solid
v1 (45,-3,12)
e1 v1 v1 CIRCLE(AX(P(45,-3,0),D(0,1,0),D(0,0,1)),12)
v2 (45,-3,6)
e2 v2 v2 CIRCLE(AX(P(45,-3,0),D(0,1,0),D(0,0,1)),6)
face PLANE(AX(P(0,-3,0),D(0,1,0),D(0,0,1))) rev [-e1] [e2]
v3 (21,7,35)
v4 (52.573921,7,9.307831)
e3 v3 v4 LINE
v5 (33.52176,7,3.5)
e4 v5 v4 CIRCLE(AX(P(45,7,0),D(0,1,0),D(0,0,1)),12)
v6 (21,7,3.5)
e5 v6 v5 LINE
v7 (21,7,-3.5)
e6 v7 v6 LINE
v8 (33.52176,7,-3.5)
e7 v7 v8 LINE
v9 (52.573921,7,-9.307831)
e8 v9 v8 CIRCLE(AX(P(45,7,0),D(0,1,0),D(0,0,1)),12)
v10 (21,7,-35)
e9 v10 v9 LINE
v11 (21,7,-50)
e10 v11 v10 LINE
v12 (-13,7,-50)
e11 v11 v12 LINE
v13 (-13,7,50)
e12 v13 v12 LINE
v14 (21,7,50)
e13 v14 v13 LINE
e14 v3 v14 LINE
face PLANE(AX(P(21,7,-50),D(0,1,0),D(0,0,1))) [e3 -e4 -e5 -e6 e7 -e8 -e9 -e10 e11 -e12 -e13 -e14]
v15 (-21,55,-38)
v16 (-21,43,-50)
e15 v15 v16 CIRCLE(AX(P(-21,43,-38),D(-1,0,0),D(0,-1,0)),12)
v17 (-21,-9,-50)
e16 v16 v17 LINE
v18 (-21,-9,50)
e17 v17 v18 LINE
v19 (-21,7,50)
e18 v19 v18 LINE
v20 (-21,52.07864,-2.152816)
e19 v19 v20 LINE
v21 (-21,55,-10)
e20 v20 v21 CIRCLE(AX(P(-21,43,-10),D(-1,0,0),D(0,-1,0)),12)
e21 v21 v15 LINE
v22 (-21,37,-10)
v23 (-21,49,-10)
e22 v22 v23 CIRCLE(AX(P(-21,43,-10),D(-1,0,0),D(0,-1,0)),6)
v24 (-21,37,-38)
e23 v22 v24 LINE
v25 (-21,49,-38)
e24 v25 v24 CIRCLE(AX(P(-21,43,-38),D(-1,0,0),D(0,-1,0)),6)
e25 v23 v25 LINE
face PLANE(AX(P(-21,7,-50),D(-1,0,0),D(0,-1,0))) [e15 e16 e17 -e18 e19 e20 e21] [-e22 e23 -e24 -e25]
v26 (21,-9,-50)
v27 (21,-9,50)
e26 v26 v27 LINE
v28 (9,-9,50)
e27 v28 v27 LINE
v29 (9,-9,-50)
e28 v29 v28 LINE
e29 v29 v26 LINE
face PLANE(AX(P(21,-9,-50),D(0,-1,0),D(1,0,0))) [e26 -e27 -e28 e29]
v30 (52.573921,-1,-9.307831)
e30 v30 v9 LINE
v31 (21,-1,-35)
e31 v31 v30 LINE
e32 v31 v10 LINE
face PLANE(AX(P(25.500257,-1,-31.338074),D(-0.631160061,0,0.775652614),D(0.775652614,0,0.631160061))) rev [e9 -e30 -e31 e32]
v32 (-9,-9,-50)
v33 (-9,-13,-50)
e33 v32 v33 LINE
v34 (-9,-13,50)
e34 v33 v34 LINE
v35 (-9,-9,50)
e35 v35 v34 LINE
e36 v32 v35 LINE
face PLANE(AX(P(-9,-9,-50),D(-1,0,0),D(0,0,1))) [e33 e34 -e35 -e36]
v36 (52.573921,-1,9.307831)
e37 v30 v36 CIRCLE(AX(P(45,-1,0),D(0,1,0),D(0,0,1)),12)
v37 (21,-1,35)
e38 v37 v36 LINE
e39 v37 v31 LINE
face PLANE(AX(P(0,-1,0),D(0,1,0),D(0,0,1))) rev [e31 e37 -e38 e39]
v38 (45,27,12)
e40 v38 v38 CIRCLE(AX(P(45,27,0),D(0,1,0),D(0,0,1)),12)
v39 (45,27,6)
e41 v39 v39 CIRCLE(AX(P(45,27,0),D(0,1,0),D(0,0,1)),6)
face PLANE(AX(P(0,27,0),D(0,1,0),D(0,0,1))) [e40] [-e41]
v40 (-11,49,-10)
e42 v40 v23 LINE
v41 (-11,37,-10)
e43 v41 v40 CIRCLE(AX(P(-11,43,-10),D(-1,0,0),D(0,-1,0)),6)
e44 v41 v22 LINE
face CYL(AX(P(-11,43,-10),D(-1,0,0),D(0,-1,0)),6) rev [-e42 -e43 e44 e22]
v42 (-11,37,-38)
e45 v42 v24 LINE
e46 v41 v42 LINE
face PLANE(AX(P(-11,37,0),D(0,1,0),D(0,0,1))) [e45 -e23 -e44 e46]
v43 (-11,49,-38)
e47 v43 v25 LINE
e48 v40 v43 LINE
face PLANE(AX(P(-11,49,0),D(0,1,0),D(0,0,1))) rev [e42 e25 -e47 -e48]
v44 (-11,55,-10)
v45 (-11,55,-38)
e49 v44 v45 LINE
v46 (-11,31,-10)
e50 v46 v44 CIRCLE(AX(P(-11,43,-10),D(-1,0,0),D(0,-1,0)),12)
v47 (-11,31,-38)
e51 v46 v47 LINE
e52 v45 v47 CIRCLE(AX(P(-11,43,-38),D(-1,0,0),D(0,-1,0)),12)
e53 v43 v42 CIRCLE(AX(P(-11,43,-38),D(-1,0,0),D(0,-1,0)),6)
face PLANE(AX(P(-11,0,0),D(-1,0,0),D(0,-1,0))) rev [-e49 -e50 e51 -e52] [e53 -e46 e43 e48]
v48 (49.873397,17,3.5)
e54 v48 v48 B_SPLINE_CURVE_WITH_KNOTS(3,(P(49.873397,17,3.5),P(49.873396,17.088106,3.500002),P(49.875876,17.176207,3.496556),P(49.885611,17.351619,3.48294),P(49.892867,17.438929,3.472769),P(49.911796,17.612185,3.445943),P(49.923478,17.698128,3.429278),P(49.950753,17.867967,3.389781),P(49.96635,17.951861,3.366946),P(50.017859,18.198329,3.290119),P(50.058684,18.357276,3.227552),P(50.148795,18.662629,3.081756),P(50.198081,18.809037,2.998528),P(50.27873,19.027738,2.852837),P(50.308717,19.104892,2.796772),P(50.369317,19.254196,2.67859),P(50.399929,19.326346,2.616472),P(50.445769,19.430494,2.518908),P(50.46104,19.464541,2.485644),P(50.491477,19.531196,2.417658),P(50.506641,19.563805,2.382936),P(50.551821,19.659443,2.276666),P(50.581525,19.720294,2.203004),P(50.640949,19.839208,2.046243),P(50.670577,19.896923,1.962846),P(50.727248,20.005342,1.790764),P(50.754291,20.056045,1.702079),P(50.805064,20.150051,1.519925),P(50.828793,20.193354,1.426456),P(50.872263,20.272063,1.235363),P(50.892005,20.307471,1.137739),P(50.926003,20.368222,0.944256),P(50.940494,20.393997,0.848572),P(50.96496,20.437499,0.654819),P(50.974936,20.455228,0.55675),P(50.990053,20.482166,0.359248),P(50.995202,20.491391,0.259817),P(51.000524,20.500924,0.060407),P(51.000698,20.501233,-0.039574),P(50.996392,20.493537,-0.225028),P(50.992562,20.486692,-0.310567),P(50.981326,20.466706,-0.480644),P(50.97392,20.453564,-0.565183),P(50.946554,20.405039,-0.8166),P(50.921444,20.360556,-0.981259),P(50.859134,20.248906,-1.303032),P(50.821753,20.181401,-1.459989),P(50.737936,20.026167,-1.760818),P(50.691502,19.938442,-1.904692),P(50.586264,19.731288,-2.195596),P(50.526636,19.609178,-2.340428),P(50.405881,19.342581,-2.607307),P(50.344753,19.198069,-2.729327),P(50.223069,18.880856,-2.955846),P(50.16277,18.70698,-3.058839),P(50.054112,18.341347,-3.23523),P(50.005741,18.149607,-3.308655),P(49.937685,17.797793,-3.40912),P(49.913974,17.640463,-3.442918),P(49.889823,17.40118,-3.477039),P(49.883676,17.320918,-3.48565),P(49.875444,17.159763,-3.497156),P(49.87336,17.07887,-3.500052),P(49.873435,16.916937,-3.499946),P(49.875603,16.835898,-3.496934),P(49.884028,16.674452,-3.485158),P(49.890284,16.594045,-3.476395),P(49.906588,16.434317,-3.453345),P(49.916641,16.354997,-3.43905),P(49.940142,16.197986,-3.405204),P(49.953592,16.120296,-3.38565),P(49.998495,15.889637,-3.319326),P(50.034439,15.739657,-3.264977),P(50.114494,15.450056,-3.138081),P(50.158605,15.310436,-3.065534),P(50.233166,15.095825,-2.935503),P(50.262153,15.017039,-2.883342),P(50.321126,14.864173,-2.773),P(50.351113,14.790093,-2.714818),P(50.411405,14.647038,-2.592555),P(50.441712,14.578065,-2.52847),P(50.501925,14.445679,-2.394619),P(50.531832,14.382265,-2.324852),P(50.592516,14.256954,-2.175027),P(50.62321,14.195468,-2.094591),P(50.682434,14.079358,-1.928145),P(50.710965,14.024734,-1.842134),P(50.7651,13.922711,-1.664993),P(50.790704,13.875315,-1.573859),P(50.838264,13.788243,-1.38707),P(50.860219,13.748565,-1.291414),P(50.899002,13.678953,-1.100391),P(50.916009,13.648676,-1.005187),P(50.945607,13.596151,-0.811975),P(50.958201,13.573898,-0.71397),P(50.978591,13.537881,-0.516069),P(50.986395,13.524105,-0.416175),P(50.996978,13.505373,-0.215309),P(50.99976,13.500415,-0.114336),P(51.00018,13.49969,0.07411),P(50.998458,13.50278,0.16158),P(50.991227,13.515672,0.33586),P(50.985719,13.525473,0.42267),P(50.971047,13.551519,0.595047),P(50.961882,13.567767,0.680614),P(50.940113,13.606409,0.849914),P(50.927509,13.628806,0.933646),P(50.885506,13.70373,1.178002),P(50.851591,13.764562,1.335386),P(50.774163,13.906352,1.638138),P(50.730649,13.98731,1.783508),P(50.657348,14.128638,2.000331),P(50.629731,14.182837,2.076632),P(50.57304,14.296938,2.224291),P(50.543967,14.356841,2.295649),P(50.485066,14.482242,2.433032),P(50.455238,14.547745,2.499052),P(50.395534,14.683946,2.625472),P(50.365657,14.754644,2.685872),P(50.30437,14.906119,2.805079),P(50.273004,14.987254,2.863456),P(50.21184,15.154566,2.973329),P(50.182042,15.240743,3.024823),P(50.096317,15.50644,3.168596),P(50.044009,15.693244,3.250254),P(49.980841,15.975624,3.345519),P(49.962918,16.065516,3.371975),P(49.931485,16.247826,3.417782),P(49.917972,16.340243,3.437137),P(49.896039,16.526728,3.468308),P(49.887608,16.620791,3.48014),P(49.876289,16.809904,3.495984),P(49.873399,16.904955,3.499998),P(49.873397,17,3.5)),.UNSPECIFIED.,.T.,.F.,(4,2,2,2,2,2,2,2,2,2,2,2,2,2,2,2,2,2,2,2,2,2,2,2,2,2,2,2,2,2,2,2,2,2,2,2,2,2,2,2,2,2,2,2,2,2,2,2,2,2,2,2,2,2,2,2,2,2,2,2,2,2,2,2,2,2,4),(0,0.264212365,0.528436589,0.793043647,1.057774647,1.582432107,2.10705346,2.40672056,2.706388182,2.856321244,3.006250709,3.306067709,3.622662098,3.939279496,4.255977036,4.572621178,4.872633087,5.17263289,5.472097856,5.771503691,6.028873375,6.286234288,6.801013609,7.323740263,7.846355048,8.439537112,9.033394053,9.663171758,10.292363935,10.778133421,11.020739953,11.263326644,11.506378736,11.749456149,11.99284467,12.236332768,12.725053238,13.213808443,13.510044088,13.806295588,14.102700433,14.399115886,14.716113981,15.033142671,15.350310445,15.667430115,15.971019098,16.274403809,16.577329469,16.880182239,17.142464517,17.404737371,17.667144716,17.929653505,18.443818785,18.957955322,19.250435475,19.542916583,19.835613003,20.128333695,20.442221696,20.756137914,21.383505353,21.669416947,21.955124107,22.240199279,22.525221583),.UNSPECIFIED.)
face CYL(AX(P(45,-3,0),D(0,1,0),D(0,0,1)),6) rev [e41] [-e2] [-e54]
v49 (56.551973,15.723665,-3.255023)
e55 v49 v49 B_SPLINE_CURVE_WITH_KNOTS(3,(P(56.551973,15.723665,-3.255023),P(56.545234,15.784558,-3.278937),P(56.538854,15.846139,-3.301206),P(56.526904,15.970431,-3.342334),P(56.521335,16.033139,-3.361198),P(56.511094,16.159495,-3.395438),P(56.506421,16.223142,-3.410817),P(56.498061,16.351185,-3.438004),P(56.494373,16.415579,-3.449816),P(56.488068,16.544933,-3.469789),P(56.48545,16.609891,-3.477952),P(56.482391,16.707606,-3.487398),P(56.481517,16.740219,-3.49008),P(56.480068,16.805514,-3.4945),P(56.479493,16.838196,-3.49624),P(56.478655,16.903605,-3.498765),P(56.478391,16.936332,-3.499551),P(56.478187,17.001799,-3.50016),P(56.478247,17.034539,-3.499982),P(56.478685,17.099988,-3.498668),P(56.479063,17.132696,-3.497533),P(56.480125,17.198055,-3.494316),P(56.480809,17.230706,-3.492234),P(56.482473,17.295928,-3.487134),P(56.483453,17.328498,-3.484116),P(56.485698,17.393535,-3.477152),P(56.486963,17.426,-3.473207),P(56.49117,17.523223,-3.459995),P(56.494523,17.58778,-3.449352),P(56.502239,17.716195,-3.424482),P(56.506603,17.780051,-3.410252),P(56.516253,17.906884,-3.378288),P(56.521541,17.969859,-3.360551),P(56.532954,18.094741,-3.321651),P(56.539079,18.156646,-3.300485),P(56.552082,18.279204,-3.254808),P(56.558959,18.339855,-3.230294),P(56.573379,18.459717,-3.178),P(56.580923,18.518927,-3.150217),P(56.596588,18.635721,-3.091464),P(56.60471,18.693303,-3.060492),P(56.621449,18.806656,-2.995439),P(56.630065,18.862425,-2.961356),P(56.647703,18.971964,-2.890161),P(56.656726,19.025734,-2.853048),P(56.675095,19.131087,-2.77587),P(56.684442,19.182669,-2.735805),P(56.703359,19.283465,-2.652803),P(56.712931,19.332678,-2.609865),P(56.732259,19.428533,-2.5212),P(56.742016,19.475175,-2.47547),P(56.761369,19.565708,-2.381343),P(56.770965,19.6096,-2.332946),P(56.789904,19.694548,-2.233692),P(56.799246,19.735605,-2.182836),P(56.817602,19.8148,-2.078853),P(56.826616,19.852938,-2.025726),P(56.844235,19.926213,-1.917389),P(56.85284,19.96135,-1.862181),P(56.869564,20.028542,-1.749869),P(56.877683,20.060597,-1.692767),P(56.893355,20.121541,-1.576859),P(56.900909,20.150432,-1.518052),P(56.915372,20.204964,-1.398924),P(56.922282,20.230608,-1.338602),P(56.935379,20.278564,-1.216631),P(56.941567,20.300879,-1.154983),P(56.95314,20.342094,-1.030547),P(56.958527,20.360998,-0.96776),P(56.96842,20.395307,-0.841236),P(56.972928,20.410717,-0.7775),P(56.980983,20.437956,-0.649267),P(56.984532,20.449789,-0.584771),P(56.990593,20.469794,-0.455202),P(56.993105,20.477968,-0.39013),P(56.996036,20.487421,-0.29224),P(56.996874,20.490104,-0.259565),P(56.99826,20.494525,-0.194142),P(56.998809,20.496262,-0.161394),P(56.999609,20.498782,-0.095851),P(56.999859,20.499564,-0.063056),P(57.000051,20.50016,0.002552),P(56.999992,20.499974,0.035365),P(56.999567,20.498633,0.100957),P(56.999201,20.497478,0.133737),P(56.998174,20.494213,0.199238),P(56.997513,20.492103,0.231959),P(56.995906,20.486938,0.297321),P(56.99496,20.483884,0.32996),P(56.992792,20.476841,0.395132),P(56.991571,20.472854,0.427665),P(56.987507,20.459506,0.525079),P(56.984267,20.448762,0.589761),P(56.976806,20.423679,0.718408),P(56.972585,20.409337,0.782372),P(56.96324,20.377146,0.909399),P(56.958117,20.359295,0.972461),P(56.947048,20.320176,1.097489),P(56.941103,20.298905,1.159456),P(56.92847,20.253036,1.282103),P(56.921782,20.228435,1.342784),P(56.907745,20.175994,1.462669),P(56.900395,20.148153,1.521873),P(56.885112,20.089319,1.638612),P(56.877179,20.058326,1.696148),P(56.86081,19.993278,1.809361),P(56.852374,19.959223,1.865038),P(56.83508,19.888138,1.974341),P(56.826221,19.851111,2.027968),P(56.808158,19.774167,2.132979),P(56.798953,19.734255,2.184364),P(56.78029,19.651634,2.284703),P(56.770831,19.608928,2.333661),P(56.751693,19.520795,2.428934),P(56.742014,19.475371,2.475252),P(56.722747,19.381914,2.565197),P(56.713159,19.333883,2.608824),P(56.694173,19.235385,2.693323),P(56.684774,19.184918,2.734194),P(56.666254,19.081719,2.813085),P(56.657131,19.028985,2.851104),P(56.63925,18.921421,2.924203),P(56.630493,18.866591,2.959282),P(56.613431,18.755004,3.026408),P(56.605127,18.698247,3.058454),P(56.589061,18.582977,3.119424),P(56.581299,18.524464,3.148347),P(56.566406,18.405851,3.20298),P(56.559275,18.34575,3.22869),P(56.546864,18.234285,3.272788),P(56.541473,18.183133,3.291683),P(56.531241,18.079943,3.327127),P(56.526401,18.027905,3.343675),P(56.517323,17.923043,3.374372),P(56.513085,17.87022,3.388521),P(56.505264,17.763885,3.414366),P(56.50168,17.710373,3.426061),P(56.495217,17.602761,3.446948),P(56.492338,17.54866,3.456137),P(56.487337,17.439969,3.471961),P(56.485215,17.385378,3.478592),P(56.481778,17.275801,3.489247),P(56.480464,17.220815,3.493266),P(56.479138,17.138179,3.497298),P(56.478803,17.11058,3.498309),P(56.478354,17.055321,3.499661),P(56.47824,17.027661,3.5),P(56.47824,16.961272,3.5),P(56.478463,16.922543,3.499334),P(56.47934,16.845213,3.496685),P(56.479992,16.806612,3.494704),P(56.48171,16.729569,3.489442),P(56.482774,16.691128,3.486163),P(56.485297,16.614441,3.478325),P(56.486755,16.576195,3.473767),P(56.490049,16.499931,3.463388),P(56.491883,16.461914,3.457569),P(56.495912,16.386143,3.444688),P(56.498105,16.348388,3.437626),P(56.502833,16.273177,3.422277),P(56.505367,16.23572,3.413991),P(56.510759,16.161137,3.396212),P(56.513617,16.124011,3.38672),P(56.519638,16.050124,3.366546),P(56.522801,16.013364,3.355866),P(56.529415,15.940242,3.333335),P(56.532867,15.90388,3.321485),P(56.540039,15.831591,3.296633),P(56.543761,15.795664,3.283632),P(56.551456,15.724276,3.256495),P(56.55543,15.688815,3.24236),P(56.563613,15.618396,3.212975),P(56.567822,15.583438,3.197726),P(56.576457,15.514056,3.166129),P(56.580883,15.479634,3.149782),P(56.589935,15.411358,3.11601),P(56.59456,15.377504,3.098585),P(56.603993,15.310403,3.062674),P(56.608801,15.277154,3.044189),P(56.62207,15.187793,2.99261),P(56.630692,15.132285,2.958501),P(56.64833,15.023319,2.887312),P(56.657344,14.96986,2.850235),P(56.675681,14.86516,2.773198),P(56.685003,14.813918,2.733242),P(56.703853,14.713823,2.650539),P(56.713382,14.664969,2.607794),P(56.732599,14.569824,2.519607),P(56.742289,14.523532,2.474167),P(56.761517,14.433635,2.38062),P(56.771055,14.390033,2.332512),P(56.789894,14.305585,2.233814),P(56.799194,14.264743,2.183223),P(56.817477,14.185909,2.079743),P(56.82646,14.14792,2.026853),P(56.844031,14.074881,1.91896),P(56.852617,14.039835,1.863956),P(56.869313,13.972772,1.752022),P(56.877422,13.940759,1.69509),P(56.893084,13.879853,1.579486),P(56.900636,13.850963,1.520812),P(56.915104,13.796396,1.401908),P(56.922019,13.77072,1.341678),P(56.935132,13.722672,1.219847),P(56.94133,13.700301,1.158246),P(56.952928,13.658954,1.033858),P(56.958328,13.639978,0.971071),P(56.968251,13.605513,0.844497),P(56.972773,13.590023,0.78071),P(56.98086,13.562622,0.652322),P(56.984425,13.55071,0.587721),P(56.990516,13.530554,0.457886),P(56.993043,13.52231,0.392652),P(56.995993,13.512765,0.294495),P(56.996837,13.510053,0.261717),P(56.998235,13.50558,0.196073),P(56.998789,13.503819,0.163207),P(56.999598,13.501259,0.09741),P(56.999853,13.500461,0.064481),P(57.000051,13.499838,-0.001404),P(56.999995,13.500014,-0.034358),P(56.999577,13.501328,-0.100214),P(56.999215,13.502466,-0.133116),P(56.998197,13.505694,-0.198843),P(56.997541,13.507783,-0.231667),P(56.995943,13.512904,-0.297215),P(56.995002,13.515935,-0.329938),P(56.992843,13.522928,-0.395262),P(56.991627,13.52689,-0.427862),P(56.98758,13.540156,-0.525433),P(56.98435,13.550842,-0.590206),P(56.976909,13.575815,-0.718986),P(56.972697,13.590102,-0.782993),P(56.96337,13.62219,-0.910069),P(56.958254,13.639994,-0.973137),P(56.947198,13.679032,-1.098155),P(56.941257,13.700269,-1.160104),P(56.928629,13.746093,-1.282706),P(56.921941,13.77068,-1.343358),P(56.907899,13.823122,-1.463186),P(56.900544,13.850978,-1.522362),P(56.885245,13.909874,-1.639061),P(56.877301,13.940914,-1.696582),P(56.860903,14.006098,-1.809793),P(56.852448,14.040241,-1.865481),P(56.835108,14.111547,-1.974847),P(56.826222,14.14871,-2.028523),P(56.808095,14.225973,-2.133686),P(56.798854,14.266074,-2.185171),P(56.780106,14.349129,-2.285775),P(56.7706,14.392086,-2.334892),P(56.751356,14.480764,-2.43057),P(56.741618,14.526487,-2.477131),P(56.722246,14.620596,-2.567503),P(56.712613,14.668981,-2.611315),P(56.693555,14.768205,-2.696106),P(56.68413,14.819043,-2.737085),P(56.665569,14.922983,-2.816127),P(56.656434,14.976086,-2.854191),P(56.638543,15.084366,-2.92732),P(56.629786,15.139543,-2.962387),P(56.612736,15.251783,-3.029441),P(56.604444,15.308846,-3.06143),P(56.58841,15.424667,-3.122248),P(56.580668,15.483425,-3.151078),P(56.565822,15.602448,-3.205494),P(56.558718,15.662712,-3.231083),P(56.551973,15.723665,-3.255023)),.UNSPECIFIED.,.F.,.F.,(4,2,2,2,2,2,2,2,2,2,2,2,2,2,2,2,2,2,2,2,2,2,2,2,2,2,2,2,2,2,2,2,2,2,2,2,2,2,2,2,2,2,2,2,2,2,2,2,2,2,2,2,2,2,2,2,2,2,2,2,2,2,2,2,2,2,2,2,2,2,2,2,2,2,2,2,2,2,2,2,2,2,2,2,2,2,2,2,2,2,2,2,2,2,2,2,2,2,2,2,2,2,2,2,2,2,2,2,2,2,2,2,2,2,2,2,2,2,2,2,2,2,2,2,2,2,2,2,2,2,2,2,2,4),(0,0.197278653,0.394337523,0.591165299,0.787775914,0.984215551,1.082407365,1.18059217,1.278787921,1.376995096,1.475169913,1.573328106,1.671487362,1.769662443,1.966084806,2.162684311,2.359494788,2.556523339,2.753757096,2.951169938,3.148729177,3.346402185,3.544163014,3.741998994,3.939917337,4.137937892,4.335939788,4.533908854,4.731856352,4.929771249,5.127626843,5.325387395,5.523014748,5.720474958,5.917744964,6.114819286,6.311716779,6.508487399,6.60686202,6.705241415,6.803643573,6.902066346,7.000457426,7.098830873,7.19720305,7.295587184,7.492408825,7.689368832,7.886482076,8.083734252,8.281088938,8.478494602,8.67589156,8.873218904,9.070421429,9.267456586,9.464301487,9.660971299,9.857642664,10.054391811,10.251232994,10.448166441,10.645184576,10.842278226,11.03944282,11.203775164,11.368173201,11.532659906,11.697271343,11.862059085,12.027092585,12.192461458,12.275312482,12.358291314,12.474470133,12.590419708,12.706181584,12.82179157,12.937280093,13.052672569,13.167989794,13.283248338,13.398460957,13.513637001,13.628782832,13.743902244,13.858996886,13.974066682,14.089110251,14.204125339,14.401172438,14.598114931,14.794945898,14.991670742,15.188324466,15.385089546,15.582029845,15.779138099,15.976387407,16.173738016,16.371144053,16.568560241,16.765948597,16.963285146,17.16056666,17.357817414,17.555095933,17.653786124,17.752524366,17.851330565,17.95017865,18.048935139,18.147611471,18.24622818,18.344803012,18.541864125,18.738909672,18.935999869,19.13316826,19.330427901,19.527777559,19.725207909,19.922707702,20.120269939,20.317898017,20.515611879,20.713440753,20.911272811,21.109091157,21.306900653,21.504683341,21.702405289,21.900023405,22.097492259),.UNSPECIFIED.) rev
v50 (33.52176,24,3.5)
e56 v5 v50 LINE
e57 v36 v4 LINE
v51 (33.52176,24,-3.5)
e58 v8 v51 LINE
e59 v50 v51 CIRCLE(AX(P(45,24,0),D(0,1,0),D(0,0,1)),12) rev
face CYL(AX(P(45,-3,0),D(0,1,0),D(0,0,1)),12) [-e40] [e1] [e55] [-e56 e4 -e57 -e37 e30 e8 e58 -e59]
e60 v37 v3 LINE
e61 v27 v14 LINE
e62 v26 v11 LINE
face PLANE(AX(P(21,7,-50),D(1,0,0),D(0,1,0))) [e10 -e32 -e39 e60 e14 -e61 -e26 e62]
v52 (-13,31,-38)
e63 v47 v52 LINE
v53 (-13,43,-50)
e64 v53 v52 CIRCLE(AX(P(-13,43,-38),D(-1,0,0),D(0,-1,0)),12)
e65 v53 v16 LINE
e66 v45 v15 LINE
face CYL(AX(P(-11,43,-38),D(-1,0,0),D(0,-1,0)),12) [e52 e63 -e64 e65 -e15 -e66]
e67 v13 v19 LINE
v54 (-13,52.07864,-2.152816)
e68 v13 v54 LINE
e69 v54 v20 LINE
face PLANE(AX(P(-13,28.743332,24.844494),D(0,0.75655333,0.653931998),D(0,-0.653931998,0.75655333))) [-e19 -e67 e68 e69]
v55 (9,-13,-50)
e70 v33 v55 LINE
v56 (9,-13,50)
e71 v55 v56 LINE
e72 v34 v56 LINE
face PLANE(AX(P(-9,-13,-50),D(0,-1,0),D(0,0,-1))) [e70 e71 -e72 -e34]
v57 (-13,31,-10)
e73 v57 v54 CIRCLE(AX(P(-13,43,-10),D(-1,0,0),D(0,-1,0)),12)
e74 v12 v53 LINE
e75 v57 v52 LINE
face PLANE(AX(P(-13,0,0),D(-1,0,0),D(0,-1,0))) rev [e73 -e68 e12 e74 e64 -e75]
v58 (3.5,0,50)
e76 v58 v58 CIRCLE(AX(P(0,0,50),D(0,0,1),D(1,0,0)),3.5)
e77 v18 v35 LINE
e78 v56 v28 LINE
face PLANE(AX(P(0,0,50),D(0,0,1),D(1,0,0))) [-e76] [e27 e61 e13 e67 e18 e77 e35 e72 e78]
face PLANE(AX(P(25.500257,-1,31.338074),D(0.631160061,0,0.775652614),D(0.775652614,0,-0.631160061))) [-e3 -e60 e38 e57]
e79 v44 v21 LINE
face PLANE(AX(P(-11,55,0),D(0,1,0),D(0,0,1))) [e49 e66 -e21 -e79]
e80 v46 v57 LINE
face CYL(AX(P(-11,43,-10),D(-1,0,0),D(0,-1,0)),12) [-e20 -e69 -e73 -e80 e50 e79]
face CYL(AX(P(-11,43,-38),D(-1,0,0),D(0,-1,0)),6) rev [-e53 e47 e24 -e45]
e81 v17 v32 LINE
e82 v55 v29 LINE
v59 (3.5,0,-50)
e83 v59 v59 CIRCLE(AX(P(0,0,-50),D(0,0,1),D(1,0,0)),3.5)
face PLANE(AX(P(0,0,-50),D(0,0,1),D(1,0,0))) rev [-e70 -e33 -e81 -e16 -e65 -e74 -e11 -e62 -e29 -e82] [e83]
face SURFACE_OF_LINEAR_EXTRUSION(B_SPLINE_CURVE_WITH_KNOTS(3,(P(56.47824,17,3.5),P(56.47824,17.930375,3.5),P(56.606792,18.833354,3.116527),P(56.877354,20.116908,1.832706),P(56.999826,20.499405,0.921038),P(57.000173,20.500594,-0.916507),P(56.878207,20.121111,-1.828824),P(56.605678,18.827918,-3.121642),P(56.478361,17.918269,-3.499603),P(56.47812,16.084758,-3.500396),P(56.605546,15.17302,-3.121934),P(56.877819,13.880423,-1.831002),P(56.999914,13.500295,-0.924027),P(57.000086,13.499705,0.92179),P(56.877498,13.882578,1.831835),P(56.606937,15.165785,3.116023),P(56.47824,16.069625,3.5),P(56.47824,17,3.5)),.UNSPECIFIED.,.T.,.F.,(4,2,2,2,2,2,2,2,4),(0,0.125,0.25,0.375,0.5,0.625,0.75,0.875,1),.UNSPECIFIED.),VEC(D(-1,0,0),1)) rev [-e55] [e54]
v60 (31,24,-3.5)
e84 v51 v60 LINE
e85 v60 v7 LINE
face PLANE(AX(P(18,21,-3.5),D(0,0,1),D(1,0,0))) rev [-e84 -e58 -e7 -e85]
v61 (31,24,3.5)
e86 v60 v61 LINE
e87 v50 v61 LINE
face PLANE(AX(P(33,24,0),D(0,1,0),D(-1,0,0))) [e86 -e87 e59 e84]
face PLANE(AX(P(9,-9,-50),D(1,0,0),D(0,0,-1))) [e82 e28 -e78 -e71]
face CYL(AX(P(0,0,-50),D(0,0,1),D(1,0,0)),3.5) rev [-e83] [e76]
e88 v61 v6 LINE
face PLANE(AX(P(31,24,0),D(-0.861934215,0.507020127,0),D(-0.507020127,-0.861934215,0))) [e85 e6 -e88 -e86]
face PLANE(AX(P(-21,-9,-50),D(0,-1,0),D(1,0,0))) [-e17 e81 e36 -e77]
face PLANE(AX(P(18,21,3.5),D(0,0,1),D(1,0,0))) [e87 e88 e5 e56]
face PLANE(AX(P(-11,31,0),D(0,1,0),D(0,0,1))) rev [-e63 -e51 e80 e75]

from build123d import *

# Parameters (mm, degrees)
SKETCH_1_R           = 3.5
EXTRUDE_1_DEPTH      = 50
EXTRUDE_2_DEPTH      = 8
EXTRUDE_3_DEPTH      = 10
EXTRUDE_4_DEPTH      = 8
EXTRUDE_5_DEPTH      = 20
EXTRUDE_5_DEPTH_BACK = 10
SKETCH_3_3_R         = 12
SKETCH_3_3_R_2       = 6
RIB_START            = -3.5
RIB_12_DEPTH         = 7
CUT_EXTRUDE_START    = 49.873397053
CUT_EXTRUDE_1_DEPTH  = 7.126602664


# Read off the part's stored shape, not the designer's step: 筋12, 切除-拉伸1
with BuildPart() as part:
    # 草图1 → 凸台-拉伸1 (new, symmetric)
    with BuildSketch(Plane.XY):
        Polygon((21, 7), (-21, 7), (-21, -9), (-9, -9), (-9, -13), (9, -13), (9, -9), (21, -9), align=None)
        Circle(SKETCH_1_R, mode=Mode.SUBTRACT)
    extrude(amount=EXTRUDE_1_DEPTH, both=True)

    # 草图2 → 凸台-拉伸2 (add)
    with BuildSketch(Plane.ZY.offset(21)):
        with BuildLine():
            Line((-50, 43), (-50, 7))
            Line((-50, 7), (50, 7))
            Line((50, 7), (-2.152816021, 52.078639964))
            ThreePointArc((-2.152816021, 52.078639964), (1.245969935, 38.813335431), (-10, 31))
            Line((-10, 31), (-38, 31))
            ThreePointArc((-38, 31), (-46.485281374, 34.514718626), (-50, 43))
        make_face()
    extrude(amount=-EXTRUDE_2_DEPTH)

    # 草图2<3> → 凸台-拉伸3 (add)
    with BuildSketch(Plane.ZY.offset(21)):
        with BuildLine():
            Line((-10, 55), (-38, 55))
            ThreePointArc((-38, 55), (-50, 43), (-38, 31))
            Line((-38, 31), (-10, 31))
            ThreePointArc((-10, 31), (2, 43), (-10, 55))
        make_face()
        with BuildLine():
            ThreePointArc((-38, 49), (-44, 43), (-38, 37))
            Line((-38, 37), (-10, 37))
            ThreePointArc((-10, 37), (-4, 43), (-10, 49))
            Line((-10, 49), (-38, 49))
        make_face(mode=Mode.SUBTRACT)
    extrude(amount=-EXTRUDE_3_DEPTH)

    # 草图3 → 凸台-拉伸4 (add)
    with BuildSketch(Plane(origin=(0, 7, 0), x_dir=(1, 0, 0), z_dir=(0, 1, 0))):
        with BuildLine():
            Line((33, 0), (21, 0))
            Line((21, 0), (21, -35))
            Line((21, -35), (52.573920737, -9.307831362))
            ThreePointArc((52.573920737, -9.307831362), (39.846702456, -10.837136357), (33, 0))
        make_face()
        with BuildLine():
            Line((21, 35), (21, 0))
            Line((21, 0), (33, 0))
            ThreePointArc((33, 0), (39.846702456, 10.837136357), (52.573920737, 9.307831362))
            Line((52.573920737, 9.307831362), (21, 35))
        make_face()
    extrude(amount=-EXTRUDE_4_DEPTH)

    # 草图3<3> → 凸台-拉伸5 (add, two sides: drawn at the far end of the back side and taken through both)
    with BuildSketch(Plane(origin=(0, 7, 0), x_dir=(1, 0, 0), z_dir=(0, 1, 0)).offset(-EXTRUDE_5_DEPTH_BACK)):
        with Locations(Location((45, 0, 0), (0, 0, 270))):
            Circle(SKETCH_3_3_R)
        with Locations(Location((45, 0, 0), (0, 0, 270))):
            Circle(SKETCH_3_3_R_2, mode=Mode.SUBTRACT)
    extrude(amount=EXTRUDE_5_DEPTH + EXTRUDE_5_DEPTH_BACK)

    # 筋12 outline → 筋12 (add)
    with BuildSketch(Plane.XY.offset(RIB_START)):
        Polygon((35, 24), (31, 24), (21, 7), (35, 7), align=None)
    extrude(amount=RIB_12_DEPTH)

    # 切除-拉伸1 outline → 切除-拉伸1 (cut)
    with BuildSketch(Plane(origin=(0, 0, 0), x_dir=(0, 0, -1), z_dir=(1, 0, 0)).offset(CUT_EXTRUDE_START)):
        with BuildLine():
            add(Edge.make_bspline(
                [(-3.5, 17), (-3.5, 17.930374798), (-3.116526668, 18.833354303), (-1.832705903, 20.11690801), (-0.921038324, 20.499404533), (0.916507131, 20.500594001), (1.828824497, 20.121110709), (3.121641798, 18.827917827), (3.499603295, 17.918268751), (3.500396051, 16.084757844), (3.121933694, 15.173019649), (1.831002297, 13.880423461), (0.924027469, 13.500295231), (-0.921789584, 13.499705127), (-1.831835104, 13.88257801), (-3.116022585, 15.165785464), (-3.5, 16.069625202), (-3.5, 17)],
                knots=[0, 0, 0, 0, 0.125, 0.125, 0.25, 0.25, 0.375, 0.375, 0.5, 0.5, 0.625, 0.625, 0.75, 0.75, 0.875, 0.875, 1, 1, 1, 1], degree=3))
        make_face()
    extrude(amount=CUT_EXTRUDE_1_DEPTH, mode=Mode.SUBTRACT)


solid = part.part
